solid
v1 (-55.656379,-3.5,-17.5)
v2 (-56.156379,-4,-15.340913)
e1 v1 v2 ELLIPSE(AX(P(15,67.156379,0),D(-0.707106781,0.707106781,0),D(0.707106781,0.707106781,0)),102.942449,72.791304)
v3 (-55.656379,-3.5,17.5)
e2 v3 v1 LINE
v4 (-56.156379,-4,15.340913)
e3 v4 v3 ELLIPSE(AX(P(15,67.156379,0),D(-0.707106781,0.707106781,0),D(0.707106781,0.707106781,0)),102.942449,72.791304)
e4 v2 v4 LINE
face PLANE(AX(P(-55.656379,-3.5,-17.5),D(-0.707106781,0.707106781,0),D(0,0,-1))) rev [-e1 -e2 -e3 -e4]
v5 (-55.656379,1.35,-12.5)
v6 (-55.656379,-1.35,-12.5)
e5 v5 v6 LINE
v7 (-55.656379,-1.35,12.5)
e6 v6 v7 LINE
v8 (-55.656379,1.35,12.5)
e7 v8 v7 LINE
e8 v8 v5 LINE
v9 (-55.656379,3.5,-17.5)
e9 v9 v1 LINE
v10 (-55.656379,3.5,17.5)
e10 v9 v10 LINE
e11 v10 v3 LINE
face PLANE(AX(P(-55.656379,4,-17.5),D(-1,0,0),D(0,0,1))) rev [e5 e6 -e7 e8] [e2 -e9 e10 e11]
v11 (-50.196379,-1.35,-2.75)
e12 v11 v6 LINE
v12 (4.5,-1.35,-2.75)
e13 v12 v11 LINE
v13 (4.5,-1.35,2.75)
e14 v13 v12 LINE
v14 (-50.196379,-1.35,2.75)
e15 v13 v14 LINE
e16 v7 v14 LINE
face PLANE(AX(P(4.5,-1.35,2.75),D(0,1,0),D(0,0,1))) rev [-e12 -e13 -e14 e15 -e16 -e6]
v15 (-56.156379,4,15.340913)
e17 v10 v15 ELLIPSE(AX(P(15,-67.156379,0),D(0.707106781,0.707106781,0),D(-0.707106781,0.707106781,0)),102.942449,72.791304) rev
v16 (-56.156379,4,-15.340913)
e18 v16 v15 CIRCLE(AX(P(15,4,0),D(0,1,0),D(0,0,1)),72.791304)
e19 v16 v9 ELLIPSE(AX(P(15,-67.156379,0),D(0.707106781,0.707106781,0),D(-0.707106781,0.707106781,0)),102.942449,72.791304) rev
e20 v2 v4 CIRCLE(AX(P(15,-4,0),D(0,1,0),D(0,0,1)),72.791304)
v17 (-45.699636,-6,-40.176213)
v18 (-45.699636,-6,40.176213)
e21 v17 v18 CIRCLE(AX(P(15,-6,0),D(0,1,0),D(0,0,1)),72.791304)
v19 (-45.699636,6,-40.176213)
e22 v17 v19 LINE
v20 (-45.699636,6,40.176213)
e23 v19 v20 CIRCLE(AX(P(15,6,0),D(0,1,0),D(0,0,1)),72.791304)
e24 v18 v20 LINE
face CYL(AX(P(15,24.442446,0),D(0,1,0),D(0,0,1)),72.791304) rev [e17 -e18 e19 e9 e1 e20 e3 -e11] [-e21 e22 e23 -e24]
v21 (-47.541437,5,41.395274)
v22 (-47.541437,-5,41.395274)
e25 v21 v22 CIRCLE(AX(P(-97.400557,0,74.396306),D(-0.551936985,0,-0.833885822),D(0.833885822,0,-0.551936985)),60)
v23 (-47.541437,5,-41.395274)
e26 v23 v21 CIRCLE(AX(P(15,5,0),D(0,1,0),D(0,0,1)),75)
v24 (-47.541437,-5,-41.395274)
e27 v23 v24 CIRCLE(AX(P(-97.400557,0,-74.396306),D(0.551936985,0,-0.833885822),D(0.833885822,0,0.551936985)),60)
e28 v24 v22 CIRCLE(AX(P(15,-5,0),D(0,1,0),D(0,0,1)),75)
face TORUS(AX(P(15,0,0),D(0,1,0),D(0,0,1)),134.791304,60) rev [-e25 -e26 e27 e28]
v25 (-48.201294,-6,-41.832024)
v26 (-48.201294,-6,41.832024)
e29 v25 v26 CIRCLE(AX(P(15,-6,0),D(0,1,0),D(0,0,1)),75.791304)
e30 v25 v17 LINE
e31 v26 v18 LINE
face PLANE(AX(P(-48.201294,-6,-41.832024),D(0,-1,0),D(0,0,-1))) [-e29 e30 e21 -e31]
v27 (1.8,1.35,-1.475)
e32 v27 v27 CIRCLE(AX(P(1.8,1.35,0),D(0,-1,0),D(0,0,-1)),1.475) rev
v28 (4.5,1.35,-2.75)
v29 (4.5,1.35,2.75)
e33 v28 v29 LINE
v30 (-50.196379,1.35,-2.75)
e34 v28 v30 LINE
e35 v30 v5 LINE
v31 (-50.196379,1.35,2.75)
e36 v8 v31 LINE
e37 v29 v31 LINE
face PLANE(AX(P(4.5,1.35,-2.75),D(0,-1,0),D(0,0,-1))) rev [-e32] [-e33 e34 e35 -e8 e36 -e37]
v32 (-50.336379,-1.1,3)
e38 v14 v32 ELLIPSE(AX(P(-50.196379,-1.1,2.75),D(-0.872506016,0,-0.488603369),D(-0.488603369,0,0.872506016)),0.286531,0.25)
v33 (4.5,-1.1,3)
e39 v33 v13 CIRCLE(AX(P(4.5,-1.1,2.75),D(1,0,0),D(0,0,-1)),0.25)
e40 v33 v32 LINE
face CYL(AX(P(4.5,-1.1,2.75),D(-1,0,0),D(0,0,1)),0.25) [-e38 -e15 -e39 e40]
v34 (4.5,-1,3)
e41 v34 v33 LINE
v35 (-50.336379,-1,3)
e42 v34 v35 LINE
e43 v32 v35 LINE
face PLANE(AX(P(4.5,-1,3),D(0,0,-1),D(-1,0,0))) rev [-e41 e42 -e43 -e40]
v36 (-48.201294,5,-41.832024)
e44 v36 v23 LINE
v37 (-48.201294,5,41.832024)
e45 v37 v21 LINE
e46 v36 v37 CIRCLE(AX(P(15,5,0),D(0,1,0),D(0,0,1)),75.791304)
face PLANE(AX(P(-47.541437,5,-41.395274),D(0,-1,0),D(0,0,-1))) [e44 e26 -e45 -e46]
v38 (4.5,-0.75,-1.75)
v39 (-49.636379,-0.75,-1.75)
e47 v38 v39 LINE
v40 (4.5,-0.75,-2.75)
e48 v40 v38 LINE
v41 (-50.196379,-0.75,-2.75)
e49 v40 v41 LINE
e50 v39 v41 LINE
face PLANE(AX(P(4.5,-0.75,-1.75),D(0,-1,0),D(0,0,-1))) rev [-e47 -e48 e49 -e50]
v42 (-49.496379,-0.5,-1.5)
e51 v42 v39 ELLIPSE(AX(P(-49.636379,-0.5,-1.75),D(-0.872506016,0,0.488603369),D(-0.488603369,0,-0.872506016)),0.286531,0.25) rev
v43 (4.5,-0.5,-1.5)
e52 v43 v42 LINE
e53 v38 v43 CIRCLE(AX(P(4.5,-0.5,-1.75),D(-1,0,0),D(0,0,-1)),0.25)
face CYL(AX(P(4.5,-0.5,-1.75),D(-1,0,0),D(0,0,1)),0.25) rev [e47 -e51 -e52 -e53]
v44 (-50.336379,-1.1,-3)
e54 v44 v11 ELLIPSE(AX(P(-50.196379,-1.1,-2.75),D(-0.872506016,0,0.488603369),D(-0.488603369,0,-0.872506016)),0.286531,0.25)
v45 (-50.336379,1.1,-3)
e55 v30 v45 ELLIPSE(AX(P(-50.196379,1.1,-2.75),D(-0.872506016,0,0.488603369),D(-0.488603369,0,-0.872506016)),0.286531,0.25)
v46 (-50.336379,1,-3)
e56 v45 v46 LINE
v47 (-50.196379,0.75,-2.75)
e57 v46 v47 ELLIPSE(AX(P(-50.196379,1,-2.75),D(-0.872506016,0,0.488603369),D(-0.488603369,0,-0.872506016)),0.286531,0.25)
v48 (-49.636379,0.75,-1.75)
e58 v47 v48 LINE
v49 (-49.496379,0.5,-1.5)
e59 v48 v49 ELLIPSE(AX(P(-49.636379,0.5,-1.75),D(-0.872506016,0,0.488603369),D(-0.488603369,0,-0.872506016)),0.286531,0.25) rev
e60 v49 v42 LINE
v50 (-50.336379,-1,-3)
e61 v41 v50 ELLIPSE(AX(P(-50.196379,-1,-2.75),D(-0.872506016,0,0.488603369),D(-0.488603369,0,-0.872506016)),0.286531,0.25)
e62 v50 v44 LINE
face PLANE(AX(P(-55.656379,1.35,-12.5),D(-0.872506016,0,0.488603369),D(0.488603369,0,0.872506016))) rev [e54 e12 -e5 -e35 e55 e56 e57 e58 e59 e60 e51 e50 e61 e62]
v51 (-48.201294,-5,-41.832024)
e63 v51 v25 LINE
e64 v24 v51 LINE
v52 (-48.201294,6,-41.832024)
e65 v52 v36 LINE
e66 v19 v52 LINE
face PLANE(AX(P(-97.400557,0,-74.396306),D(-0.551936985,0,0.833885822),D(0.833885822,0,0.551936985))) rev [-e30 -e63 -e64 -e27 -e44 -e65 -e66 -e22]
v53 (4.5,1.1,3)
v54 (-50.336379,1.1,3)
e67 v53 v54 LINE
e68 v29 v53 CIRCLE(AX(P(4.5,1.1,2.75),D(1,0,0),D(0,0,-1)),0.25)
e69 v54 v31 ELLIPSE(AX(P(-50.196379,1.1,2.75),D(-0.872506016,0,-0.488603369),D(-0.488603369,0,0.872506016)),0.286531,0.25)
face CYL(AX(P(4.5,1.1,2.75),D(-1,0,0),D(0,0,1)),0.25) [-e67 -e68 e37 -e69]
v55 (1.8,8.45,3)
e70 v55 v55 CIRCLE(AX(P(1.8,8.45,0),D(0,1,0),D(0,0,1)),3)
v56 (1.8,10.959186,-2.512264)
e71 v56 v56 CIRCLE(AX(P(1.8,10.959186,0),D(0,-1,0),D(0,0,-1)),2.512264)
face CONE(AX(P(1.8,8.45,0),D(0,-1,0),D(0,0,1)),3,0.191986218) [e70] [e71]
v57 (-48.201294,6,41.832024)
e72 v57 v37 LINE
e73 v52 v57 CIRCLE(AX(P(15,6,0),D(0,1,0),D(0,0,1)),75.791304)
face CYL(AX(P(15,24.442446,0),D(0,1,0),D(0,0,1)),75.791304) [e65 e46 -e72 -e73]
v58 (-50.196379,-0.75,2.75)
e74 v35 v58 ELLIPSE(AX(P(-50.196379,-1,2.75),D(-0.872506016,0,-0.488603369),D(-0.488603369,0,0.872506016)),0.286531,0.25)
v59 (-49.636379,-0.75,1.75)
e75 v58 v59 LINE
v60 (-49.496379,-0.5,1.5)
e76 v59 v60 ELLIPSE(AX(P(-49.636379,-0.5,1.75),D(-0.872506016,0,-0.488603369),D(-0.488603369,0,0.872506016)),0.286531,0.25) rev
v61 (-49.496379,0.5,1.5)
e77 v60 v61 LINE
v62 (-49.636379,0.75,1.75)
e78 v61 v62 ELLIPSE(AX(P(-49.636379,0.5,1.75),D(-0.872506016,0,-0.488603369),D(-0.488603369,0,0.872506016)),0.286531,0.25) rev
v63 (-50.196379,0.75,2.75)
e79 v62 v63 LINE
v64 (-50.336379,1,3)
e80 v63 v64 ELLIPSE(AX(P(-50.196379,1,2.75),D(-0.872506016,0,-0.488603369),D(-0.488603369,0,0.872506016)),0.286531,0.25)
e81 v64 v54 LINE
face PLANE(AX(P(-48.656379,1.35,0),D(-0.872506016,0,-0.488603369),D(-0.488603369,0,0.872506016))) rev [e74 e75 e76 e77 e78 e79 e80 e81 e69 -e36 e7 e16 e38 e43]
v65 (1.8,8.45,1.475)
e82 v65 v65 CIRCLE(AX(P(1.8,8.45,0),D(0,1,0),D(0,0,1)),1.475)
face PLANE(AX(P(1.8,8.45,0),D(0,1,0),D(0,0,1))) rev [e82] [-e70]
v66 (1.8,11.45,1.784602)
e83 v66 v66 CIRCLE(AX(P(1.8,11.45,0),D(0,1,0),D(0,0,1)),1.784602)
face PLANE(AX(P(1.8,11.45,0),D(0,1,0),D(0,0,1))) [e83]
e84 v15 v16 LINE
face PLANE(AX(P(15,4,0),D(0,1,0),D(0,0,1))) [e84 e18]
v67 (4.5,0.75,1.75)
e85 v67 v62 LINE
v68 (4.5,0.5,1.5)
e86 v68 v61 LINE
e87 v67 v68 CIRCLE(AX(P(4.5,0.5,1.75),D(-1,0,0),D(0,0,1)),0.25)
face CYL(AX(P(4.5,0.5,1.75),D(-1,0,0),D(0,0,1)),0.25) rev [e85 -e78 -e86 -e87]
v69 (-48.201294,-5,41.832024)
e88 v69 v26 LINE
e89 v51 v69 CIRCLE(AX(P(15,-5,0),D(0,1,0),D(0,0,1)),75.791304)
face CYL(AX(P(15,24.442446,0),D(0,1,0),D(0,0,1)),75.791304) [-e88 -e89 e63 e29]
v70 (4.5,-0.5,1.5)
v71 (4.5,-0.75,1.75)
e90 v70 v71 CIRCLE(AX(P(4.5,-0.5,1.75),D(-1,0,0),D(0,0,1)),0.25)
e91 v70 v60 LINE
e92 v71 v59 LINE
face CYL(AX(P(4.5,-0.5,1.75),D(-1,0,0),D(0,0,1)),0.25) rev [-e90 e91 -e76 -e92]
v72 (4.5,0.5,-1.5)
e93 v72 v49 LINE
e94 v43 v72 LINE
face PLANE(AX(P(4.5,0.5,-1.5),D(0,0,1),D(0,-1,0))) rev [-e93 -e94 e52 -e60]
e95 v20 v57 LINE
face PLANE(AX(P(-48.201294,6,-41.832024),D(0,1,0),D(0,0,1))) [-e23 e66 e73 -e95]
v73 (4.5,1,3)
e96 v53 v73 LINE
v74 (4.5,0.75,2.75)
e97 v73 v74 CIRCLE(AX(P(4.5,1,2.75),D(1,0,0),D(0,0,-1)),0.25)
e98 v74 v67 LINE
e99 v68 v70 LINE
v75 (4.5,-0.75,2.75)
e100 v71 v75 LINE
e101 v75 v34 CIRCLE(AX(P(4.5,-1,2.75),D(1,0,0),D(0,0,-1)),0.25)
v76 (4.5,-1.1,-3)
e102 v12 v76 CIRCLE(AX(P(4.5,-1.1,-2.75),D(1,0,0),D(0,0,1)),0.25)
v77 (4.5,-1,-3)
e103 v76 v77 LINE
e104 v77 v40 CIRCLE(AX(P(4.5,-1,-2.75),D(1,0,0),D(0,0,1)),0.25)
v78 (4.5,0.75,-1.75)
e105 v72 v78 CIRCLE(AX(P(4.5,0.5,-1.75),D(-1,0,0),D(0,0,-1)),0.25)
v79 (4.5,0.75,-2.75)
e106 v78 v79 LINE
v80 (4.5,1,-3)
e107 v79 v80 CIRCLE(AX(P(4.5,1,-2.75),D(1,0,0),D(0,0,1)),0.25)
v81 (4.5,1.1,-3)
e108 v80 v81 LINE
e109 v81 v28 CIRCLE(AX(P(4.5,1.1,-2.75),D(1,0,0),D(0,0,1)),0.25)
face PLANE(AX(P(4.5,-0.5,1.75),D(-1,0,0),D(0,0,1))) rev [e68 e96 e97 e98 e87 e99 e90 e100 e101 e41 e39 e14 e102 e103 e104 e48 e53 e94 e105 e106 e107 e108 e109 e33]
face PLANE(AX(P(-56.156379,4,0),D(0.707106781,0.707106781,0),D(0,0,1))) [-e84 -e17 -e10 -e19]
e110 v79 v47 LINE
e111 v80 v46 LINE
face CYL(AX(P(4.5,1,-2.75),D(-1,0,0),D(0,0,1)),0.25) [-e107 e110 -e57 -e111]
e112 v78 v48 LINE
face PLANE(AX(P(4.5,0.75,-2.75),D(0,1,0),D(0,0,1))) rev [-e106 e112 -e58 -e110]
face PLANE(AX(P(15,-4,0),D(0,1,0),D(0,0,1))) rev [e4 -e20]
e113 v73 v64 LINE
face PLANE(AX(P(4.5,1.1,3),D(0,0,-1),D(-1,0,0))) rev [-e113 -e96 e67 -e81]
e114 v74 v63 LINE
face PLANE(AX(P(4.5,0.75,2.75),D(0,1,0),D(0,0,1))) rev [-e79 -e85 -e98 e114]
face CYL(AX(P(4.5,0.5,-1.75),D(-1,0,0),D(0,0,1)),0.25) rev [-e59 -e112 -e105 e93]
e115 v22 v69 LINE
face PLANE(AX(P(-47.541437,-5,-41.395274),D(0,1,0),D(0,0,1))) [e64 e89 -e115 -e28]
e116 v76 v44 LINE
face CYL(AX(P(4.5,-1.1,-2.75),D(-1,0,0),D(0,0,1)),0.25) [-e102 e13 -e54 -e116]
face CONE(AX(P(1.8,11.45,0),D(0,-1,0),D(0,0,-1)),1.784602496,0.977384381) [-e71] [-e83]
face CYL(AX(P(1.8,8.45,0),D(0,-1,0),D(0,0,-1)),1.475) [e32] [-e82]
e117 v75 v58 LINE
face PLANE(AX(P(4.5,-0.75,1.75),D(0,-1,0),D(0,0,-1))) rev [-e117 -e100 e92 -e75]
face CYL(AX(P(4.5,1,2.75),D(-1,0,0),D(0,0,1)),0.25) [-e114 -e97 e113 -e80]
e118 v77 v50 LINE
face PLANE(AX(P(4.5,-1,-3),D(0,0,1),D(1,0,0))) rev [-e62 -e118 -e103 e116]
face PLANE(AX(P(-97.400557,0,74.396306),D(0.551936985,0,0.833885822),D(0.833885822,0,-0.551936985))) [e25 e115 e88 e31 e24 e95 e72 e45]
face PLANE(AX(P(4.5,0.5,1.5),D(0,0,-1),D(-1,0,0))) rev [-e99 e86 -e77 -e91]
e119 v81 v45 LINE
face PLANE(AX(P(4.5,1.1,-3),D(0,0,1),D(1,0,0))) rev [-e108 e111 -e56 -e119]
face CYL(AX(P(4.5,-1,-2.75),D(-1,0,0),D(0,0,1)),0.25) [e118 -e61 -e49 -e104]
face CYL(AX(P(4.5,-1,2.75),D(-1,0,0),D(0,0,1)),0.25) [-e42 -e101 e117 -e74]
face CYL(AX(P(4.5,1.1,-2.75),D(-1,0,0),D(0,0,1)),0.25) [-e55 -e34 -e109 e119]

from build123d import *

# Parameters (mm, degrees)
REVOLVE1_ANGLE                  = 67
BOSS_EXTRUDE1_REACH             = 76.037
BOSS_EXTRUDE1_END_RADIUS        = 72.791303716
BOSS_EXTRUDE1_DIRECTION_2_DEPTH = 4.5
BOSS_EXTRUDE2_DEPTH             = 4
BOSS_EXTRUDE3_DEPTH             = 1.35
CHAMFER1_SIZE                   = 0.5
SKETCH5_R                       = 1.475
BOSS_EXTRUDE4_DEPTH             = 7.1
SKETCH6_R                       = 3
BOSS_EXTRUDE5_DEPTH             = 3
BOSS_EXTRUDE5_TAPER             = 11
CHAMFER2_SIZE                   = 0.5
CHAMFER2_SIZE_2                 = 0.632256576


with BuildPart() as part:
    # Sketch1 → Revolve1 (revolve, symmetric)
    with BuildSketch(Plane.XY) as revolve1_sk:
        with BuildLine():
            Line((-60, 5), (-60.791303716, 5))
            Line((-60.791303716, 5), (-60.791303716, 6))
            Line((-60.791303716, 6), (-57.791303716, 6))
            Line((-57.791303716, 6), (-57.791303716, -6))
            Line((-57.791303716, -6), (-60.791303716, -6))
            Line((-60.791303716, -6), (-60.791303716, -5))
            Line((-60.791303716, -5), (-60, -5))
            ThreePointArc((-60, -5), (-59.791303716, 0), (-60, 5))
        make_face()
    revolve(axis=Axis((15, 24.442446043, 0), (0, -1, 0)), revolution_arc=REVOLVE1_ANGLE / 2)
    revolve(revolve1_sk.sketch, axis=Axis((15, 24.442446043, 0), (0, 1, 0)), revolution_arc=REVOLVE1_ANGLE / 2)

    # Boss-Extrude1: up to this cylinder (the profile starts inside it)
    boss_extrude1_end = Plane(origin=(15, 0, 0), z_dir=(0, 1, 0)) * Cylinder(BOSS_EXTRUDE1_END_RADIUS, 298.656607431, mode=Mode.PRIVATE)
    # Sketch2 → Boss-Extrude1 (add, up to the surface)
    with BuildSketch(Plane(origin=(0, 0, 0), x_dir=(0, 0, -1), z_dir=(1, 0, 0)), mode=Mode.PRIVATE) as boss_extrude1_sk1:
        with BuildLine():
            Line((2.75, 1.35), (-2.75, 1.35))
            ThreePointArc((-2.75, 1.35), (-2.926776695, 1.276776695), (-3, 1.1))
            Line((-3, 1.1), (-3, 1))
            ThreePointArc((-3, 1), (-2.926776695, 0.823223305), (-2.75, 0.75))
            Line((-2.75, 0.75), (-1.75, 0.75))
            ThreePointArc((-1.75, 0.75), (-1.573223305, 0.676776695), (-1.5, 0.5))
            Line((-1.5, 0.5), (-1.5, -0.5))
            ThreePointArc((-1.5, -0.5), (-1.573223305, -0.676776695), (-1.75, -0.75))
            Line((-1.75, -0.75), (-2.75, -0.75))
            ThreePointArc((-2.75, -0.75), (-2.926776695, -0.823223305), (-3, -1))
            Line((-3, -1), (-3, -1.1))
            ThreePointArc((-3, -1.1), (-2.926776695, -1.276776695), (-2.75, -1.35))
            Line((-2.75, -1.35), (2.75, -1.35))
            ThreePointArc((2.75, -1.35), (2.926776695, -1.276776695), (3, -1.1))
            Line((3, -1.1), (3, -1))
            ThreePointArc((3, -1), (2.926776695, -0.823223305), (2.75, -0.75))
            Line((2.75, -0.75), (1.75, -0.75))
            ThreePointArc((1.75, -0.75), (1.573223305, -0.676776695), (1.5, -0.5))
            Line((1.5, -0.5), (1.5, 0.5))
            ThreePointArc((1.5, 0.5), (1.573223305, 0.676776695), (1.75, 0.75))
            Line((1.75, 0.75), (2.75, 0.75))
            ThreePointArc((2.75, 0.75), (2.926776695, 0.823223305), (3, 1))
            Line((3, 1), (3, 1.1))
            ThreePointArc((3, 1.1), (2.926776695, 1.276776695), (2.75, 1.35))
        make_face()
    boss_extrude1_tool1 = extrude(boss_extrude1_sk1.sketch, amount=-BOSS_EXTRUDE1_REACH, mode=Mode.PRIVATE) & boss_extrude1_end
    add(boss_extrude1_tool1.solids().sort_by_distance((0, 0, 0))[0])

    # Sketch2 → Boss-Extrude1 direction 2 (add)
    with BuildSketch(Plane(origin=(0, 0, 0), x_dir=(0, 0, -1), z_dir=(1, 0, 0))):
        with BuildLine():
            Line((2.75, 1.35), (-2.75, 1.35))
            ThreePointArc((-2.75, 1.35), (-2.926776695, 1.276776695), (-3, 1.1))
            Line((-3, 1.1), (-3, 1))
            ThreePointArc((-3, 1), (-2.926776695, 0.823223305), (-2.75, 0.75))
            Line((-2.75, 0.75), (-1.75, 0.75))
            ThreePointArc((-1.75, 0.75), (-1.573223305, 0.676776695), (-1.5, 0.5))
            Line((-1.5, 0.5), (-1.5, -0.5))
            ThreePointArc((-1.5, -0.5), (-1.573223305, -0.676776695), (-1.75, -0.75))
            Line((-1.75, -0.75), (-2.75, -0.75))
            ThreePointArc((-2.75, -0.75), (-2.926776695, -0.823223305), (-3, -1))
            Line((-3, -1), (-3, -1.1))
            ThreePointArc((-3, -1.1), (-2.926776695, -1.276776695), (-2.75, -1.35))
            Line((-2.75, -1.35), (2.75, -1.35))
            ThreePointArc((2.75, -1.35), (2.926776695, -1.276776695), (3, -1.1))
            Line((3, -1.1), (3, -1))
            ThreePointArc((3, -1), (2.926776695, -0.823223305), (2.75, -0.75))
            Line((2.75, -0.75), (1.75, -0.75))
            ThreePointArc((1.75, -0.75), (1.573223305, -0.676776695), (1.5, -0.5))
            Line((1.5, -0.5), (1.5, 0.5))
            ThreePointArc((1.5, 0.5), (1.573223305, 0.676776695), (1.75, 0.75))
            Line((1.75, 0.75), (2.75, 0.75))
            ThreePointArc((2.75, 0.75), (2.926776695, 0.823223305), (3, 1))
            Line((3, 1), (3, 1.1))
            ThreePointArc((3, 1.1), (2.926776695, 1.276776695), (2.75, 1.35))
        make_face()
    extrude(amount=BOSS_EXTRUDE1_DIRECTION_2_DEPTH)

    # Sketch3 → Boss-Extrude2 (add, symmetric)
    with BuildSketch(Plane(origin=(0, 0, 0), x_dir=(1, 0, 0), z_dir=(0, 1, 0))):
        with BuildLine():
            Line((-55.656379023, 17.5), (-55.656379023, -17.5))
            ThreePointArc((-55.656379023, -17.5), (-57.791303716, 0), (-55.656379023, 17.5))
        make_face()
    extrude(amount=BOSS_EXTRUDE2_DEPTH, both=True)

    # Sketch4 → Boss-Extrude3 (add, symmetric)
    with BuildSketch(Plane(origin=(0, 0, 0), x_dir=(1, 0, 0), z_dir=(0, 1, 0))):
        Polygon((-55.656379023, -12.5), (-55.656379023, 12.5), (-48.656379023, 0), align=None)
    extrude(amount=BOSS_EXTRUDE3_DEPTH, both=True)

    # Chamfer1
    chamfer1_edges = [part.edges().sort_by_distance(p)[0] for p in [
        (-55.656379023, -4, 0),
        (-55.656379023, 4, 0),
    ]]
    chamfer(chamfer1_edges, length=CHAMFER1_SIZE)

    # Sketch5 → Boss-Extrude4 (add)
    with BuildSketch(Plane(origin=(0, 1.35, 0), x_dir=(1, 0, 0), z_dir=(0, 1, 0))):
        with Locations(Location((1.8, 0, 0), (0, 0, 90))):
            Circle(SKETCH5_R)
    extrude(amount=BOSS_EXTRUDE4_DEPTH)

    # Sketch6 → Boss-Extrude5 (add)
    with BuildSketch(Plane(origin=(0, 8.45, 0), x_dir=(1, 0, 0), z_dir=(0, 1, 0))):
        with Locations((1.8, 0)):
            Circle(SKETCH6_R)
    extrude(amount=BOSS_EXTRUDE5_DEPTH, taper=BOSS_EXTRUDE5_TAPER)

    # Chamfer2
    # the kernel refuses this chamfer: 0.632256576, 0.5 mm, written as the material it takes off along each edge
    with BuildSketch(Plane(origin=(1.8, 11.45, 0), x_dir=(1, 0, 0), z_dir=(0, 0, -1))) as chamfer2_piece_1:
        Polygon((2.416859073 + CHAMFER2_SIZE * 0.190808995377, CHAMFER2_SIZE * 0.981627183448), (2.416859073 - CHAMFER2_SIZE_2, 0), (2.416859073, 0), align=None)
    revolve(axis=Axis((1.8, 11.45, 0), (0, -1, 0)), mode=Mode.SUBTRACT)


solid = part.part
